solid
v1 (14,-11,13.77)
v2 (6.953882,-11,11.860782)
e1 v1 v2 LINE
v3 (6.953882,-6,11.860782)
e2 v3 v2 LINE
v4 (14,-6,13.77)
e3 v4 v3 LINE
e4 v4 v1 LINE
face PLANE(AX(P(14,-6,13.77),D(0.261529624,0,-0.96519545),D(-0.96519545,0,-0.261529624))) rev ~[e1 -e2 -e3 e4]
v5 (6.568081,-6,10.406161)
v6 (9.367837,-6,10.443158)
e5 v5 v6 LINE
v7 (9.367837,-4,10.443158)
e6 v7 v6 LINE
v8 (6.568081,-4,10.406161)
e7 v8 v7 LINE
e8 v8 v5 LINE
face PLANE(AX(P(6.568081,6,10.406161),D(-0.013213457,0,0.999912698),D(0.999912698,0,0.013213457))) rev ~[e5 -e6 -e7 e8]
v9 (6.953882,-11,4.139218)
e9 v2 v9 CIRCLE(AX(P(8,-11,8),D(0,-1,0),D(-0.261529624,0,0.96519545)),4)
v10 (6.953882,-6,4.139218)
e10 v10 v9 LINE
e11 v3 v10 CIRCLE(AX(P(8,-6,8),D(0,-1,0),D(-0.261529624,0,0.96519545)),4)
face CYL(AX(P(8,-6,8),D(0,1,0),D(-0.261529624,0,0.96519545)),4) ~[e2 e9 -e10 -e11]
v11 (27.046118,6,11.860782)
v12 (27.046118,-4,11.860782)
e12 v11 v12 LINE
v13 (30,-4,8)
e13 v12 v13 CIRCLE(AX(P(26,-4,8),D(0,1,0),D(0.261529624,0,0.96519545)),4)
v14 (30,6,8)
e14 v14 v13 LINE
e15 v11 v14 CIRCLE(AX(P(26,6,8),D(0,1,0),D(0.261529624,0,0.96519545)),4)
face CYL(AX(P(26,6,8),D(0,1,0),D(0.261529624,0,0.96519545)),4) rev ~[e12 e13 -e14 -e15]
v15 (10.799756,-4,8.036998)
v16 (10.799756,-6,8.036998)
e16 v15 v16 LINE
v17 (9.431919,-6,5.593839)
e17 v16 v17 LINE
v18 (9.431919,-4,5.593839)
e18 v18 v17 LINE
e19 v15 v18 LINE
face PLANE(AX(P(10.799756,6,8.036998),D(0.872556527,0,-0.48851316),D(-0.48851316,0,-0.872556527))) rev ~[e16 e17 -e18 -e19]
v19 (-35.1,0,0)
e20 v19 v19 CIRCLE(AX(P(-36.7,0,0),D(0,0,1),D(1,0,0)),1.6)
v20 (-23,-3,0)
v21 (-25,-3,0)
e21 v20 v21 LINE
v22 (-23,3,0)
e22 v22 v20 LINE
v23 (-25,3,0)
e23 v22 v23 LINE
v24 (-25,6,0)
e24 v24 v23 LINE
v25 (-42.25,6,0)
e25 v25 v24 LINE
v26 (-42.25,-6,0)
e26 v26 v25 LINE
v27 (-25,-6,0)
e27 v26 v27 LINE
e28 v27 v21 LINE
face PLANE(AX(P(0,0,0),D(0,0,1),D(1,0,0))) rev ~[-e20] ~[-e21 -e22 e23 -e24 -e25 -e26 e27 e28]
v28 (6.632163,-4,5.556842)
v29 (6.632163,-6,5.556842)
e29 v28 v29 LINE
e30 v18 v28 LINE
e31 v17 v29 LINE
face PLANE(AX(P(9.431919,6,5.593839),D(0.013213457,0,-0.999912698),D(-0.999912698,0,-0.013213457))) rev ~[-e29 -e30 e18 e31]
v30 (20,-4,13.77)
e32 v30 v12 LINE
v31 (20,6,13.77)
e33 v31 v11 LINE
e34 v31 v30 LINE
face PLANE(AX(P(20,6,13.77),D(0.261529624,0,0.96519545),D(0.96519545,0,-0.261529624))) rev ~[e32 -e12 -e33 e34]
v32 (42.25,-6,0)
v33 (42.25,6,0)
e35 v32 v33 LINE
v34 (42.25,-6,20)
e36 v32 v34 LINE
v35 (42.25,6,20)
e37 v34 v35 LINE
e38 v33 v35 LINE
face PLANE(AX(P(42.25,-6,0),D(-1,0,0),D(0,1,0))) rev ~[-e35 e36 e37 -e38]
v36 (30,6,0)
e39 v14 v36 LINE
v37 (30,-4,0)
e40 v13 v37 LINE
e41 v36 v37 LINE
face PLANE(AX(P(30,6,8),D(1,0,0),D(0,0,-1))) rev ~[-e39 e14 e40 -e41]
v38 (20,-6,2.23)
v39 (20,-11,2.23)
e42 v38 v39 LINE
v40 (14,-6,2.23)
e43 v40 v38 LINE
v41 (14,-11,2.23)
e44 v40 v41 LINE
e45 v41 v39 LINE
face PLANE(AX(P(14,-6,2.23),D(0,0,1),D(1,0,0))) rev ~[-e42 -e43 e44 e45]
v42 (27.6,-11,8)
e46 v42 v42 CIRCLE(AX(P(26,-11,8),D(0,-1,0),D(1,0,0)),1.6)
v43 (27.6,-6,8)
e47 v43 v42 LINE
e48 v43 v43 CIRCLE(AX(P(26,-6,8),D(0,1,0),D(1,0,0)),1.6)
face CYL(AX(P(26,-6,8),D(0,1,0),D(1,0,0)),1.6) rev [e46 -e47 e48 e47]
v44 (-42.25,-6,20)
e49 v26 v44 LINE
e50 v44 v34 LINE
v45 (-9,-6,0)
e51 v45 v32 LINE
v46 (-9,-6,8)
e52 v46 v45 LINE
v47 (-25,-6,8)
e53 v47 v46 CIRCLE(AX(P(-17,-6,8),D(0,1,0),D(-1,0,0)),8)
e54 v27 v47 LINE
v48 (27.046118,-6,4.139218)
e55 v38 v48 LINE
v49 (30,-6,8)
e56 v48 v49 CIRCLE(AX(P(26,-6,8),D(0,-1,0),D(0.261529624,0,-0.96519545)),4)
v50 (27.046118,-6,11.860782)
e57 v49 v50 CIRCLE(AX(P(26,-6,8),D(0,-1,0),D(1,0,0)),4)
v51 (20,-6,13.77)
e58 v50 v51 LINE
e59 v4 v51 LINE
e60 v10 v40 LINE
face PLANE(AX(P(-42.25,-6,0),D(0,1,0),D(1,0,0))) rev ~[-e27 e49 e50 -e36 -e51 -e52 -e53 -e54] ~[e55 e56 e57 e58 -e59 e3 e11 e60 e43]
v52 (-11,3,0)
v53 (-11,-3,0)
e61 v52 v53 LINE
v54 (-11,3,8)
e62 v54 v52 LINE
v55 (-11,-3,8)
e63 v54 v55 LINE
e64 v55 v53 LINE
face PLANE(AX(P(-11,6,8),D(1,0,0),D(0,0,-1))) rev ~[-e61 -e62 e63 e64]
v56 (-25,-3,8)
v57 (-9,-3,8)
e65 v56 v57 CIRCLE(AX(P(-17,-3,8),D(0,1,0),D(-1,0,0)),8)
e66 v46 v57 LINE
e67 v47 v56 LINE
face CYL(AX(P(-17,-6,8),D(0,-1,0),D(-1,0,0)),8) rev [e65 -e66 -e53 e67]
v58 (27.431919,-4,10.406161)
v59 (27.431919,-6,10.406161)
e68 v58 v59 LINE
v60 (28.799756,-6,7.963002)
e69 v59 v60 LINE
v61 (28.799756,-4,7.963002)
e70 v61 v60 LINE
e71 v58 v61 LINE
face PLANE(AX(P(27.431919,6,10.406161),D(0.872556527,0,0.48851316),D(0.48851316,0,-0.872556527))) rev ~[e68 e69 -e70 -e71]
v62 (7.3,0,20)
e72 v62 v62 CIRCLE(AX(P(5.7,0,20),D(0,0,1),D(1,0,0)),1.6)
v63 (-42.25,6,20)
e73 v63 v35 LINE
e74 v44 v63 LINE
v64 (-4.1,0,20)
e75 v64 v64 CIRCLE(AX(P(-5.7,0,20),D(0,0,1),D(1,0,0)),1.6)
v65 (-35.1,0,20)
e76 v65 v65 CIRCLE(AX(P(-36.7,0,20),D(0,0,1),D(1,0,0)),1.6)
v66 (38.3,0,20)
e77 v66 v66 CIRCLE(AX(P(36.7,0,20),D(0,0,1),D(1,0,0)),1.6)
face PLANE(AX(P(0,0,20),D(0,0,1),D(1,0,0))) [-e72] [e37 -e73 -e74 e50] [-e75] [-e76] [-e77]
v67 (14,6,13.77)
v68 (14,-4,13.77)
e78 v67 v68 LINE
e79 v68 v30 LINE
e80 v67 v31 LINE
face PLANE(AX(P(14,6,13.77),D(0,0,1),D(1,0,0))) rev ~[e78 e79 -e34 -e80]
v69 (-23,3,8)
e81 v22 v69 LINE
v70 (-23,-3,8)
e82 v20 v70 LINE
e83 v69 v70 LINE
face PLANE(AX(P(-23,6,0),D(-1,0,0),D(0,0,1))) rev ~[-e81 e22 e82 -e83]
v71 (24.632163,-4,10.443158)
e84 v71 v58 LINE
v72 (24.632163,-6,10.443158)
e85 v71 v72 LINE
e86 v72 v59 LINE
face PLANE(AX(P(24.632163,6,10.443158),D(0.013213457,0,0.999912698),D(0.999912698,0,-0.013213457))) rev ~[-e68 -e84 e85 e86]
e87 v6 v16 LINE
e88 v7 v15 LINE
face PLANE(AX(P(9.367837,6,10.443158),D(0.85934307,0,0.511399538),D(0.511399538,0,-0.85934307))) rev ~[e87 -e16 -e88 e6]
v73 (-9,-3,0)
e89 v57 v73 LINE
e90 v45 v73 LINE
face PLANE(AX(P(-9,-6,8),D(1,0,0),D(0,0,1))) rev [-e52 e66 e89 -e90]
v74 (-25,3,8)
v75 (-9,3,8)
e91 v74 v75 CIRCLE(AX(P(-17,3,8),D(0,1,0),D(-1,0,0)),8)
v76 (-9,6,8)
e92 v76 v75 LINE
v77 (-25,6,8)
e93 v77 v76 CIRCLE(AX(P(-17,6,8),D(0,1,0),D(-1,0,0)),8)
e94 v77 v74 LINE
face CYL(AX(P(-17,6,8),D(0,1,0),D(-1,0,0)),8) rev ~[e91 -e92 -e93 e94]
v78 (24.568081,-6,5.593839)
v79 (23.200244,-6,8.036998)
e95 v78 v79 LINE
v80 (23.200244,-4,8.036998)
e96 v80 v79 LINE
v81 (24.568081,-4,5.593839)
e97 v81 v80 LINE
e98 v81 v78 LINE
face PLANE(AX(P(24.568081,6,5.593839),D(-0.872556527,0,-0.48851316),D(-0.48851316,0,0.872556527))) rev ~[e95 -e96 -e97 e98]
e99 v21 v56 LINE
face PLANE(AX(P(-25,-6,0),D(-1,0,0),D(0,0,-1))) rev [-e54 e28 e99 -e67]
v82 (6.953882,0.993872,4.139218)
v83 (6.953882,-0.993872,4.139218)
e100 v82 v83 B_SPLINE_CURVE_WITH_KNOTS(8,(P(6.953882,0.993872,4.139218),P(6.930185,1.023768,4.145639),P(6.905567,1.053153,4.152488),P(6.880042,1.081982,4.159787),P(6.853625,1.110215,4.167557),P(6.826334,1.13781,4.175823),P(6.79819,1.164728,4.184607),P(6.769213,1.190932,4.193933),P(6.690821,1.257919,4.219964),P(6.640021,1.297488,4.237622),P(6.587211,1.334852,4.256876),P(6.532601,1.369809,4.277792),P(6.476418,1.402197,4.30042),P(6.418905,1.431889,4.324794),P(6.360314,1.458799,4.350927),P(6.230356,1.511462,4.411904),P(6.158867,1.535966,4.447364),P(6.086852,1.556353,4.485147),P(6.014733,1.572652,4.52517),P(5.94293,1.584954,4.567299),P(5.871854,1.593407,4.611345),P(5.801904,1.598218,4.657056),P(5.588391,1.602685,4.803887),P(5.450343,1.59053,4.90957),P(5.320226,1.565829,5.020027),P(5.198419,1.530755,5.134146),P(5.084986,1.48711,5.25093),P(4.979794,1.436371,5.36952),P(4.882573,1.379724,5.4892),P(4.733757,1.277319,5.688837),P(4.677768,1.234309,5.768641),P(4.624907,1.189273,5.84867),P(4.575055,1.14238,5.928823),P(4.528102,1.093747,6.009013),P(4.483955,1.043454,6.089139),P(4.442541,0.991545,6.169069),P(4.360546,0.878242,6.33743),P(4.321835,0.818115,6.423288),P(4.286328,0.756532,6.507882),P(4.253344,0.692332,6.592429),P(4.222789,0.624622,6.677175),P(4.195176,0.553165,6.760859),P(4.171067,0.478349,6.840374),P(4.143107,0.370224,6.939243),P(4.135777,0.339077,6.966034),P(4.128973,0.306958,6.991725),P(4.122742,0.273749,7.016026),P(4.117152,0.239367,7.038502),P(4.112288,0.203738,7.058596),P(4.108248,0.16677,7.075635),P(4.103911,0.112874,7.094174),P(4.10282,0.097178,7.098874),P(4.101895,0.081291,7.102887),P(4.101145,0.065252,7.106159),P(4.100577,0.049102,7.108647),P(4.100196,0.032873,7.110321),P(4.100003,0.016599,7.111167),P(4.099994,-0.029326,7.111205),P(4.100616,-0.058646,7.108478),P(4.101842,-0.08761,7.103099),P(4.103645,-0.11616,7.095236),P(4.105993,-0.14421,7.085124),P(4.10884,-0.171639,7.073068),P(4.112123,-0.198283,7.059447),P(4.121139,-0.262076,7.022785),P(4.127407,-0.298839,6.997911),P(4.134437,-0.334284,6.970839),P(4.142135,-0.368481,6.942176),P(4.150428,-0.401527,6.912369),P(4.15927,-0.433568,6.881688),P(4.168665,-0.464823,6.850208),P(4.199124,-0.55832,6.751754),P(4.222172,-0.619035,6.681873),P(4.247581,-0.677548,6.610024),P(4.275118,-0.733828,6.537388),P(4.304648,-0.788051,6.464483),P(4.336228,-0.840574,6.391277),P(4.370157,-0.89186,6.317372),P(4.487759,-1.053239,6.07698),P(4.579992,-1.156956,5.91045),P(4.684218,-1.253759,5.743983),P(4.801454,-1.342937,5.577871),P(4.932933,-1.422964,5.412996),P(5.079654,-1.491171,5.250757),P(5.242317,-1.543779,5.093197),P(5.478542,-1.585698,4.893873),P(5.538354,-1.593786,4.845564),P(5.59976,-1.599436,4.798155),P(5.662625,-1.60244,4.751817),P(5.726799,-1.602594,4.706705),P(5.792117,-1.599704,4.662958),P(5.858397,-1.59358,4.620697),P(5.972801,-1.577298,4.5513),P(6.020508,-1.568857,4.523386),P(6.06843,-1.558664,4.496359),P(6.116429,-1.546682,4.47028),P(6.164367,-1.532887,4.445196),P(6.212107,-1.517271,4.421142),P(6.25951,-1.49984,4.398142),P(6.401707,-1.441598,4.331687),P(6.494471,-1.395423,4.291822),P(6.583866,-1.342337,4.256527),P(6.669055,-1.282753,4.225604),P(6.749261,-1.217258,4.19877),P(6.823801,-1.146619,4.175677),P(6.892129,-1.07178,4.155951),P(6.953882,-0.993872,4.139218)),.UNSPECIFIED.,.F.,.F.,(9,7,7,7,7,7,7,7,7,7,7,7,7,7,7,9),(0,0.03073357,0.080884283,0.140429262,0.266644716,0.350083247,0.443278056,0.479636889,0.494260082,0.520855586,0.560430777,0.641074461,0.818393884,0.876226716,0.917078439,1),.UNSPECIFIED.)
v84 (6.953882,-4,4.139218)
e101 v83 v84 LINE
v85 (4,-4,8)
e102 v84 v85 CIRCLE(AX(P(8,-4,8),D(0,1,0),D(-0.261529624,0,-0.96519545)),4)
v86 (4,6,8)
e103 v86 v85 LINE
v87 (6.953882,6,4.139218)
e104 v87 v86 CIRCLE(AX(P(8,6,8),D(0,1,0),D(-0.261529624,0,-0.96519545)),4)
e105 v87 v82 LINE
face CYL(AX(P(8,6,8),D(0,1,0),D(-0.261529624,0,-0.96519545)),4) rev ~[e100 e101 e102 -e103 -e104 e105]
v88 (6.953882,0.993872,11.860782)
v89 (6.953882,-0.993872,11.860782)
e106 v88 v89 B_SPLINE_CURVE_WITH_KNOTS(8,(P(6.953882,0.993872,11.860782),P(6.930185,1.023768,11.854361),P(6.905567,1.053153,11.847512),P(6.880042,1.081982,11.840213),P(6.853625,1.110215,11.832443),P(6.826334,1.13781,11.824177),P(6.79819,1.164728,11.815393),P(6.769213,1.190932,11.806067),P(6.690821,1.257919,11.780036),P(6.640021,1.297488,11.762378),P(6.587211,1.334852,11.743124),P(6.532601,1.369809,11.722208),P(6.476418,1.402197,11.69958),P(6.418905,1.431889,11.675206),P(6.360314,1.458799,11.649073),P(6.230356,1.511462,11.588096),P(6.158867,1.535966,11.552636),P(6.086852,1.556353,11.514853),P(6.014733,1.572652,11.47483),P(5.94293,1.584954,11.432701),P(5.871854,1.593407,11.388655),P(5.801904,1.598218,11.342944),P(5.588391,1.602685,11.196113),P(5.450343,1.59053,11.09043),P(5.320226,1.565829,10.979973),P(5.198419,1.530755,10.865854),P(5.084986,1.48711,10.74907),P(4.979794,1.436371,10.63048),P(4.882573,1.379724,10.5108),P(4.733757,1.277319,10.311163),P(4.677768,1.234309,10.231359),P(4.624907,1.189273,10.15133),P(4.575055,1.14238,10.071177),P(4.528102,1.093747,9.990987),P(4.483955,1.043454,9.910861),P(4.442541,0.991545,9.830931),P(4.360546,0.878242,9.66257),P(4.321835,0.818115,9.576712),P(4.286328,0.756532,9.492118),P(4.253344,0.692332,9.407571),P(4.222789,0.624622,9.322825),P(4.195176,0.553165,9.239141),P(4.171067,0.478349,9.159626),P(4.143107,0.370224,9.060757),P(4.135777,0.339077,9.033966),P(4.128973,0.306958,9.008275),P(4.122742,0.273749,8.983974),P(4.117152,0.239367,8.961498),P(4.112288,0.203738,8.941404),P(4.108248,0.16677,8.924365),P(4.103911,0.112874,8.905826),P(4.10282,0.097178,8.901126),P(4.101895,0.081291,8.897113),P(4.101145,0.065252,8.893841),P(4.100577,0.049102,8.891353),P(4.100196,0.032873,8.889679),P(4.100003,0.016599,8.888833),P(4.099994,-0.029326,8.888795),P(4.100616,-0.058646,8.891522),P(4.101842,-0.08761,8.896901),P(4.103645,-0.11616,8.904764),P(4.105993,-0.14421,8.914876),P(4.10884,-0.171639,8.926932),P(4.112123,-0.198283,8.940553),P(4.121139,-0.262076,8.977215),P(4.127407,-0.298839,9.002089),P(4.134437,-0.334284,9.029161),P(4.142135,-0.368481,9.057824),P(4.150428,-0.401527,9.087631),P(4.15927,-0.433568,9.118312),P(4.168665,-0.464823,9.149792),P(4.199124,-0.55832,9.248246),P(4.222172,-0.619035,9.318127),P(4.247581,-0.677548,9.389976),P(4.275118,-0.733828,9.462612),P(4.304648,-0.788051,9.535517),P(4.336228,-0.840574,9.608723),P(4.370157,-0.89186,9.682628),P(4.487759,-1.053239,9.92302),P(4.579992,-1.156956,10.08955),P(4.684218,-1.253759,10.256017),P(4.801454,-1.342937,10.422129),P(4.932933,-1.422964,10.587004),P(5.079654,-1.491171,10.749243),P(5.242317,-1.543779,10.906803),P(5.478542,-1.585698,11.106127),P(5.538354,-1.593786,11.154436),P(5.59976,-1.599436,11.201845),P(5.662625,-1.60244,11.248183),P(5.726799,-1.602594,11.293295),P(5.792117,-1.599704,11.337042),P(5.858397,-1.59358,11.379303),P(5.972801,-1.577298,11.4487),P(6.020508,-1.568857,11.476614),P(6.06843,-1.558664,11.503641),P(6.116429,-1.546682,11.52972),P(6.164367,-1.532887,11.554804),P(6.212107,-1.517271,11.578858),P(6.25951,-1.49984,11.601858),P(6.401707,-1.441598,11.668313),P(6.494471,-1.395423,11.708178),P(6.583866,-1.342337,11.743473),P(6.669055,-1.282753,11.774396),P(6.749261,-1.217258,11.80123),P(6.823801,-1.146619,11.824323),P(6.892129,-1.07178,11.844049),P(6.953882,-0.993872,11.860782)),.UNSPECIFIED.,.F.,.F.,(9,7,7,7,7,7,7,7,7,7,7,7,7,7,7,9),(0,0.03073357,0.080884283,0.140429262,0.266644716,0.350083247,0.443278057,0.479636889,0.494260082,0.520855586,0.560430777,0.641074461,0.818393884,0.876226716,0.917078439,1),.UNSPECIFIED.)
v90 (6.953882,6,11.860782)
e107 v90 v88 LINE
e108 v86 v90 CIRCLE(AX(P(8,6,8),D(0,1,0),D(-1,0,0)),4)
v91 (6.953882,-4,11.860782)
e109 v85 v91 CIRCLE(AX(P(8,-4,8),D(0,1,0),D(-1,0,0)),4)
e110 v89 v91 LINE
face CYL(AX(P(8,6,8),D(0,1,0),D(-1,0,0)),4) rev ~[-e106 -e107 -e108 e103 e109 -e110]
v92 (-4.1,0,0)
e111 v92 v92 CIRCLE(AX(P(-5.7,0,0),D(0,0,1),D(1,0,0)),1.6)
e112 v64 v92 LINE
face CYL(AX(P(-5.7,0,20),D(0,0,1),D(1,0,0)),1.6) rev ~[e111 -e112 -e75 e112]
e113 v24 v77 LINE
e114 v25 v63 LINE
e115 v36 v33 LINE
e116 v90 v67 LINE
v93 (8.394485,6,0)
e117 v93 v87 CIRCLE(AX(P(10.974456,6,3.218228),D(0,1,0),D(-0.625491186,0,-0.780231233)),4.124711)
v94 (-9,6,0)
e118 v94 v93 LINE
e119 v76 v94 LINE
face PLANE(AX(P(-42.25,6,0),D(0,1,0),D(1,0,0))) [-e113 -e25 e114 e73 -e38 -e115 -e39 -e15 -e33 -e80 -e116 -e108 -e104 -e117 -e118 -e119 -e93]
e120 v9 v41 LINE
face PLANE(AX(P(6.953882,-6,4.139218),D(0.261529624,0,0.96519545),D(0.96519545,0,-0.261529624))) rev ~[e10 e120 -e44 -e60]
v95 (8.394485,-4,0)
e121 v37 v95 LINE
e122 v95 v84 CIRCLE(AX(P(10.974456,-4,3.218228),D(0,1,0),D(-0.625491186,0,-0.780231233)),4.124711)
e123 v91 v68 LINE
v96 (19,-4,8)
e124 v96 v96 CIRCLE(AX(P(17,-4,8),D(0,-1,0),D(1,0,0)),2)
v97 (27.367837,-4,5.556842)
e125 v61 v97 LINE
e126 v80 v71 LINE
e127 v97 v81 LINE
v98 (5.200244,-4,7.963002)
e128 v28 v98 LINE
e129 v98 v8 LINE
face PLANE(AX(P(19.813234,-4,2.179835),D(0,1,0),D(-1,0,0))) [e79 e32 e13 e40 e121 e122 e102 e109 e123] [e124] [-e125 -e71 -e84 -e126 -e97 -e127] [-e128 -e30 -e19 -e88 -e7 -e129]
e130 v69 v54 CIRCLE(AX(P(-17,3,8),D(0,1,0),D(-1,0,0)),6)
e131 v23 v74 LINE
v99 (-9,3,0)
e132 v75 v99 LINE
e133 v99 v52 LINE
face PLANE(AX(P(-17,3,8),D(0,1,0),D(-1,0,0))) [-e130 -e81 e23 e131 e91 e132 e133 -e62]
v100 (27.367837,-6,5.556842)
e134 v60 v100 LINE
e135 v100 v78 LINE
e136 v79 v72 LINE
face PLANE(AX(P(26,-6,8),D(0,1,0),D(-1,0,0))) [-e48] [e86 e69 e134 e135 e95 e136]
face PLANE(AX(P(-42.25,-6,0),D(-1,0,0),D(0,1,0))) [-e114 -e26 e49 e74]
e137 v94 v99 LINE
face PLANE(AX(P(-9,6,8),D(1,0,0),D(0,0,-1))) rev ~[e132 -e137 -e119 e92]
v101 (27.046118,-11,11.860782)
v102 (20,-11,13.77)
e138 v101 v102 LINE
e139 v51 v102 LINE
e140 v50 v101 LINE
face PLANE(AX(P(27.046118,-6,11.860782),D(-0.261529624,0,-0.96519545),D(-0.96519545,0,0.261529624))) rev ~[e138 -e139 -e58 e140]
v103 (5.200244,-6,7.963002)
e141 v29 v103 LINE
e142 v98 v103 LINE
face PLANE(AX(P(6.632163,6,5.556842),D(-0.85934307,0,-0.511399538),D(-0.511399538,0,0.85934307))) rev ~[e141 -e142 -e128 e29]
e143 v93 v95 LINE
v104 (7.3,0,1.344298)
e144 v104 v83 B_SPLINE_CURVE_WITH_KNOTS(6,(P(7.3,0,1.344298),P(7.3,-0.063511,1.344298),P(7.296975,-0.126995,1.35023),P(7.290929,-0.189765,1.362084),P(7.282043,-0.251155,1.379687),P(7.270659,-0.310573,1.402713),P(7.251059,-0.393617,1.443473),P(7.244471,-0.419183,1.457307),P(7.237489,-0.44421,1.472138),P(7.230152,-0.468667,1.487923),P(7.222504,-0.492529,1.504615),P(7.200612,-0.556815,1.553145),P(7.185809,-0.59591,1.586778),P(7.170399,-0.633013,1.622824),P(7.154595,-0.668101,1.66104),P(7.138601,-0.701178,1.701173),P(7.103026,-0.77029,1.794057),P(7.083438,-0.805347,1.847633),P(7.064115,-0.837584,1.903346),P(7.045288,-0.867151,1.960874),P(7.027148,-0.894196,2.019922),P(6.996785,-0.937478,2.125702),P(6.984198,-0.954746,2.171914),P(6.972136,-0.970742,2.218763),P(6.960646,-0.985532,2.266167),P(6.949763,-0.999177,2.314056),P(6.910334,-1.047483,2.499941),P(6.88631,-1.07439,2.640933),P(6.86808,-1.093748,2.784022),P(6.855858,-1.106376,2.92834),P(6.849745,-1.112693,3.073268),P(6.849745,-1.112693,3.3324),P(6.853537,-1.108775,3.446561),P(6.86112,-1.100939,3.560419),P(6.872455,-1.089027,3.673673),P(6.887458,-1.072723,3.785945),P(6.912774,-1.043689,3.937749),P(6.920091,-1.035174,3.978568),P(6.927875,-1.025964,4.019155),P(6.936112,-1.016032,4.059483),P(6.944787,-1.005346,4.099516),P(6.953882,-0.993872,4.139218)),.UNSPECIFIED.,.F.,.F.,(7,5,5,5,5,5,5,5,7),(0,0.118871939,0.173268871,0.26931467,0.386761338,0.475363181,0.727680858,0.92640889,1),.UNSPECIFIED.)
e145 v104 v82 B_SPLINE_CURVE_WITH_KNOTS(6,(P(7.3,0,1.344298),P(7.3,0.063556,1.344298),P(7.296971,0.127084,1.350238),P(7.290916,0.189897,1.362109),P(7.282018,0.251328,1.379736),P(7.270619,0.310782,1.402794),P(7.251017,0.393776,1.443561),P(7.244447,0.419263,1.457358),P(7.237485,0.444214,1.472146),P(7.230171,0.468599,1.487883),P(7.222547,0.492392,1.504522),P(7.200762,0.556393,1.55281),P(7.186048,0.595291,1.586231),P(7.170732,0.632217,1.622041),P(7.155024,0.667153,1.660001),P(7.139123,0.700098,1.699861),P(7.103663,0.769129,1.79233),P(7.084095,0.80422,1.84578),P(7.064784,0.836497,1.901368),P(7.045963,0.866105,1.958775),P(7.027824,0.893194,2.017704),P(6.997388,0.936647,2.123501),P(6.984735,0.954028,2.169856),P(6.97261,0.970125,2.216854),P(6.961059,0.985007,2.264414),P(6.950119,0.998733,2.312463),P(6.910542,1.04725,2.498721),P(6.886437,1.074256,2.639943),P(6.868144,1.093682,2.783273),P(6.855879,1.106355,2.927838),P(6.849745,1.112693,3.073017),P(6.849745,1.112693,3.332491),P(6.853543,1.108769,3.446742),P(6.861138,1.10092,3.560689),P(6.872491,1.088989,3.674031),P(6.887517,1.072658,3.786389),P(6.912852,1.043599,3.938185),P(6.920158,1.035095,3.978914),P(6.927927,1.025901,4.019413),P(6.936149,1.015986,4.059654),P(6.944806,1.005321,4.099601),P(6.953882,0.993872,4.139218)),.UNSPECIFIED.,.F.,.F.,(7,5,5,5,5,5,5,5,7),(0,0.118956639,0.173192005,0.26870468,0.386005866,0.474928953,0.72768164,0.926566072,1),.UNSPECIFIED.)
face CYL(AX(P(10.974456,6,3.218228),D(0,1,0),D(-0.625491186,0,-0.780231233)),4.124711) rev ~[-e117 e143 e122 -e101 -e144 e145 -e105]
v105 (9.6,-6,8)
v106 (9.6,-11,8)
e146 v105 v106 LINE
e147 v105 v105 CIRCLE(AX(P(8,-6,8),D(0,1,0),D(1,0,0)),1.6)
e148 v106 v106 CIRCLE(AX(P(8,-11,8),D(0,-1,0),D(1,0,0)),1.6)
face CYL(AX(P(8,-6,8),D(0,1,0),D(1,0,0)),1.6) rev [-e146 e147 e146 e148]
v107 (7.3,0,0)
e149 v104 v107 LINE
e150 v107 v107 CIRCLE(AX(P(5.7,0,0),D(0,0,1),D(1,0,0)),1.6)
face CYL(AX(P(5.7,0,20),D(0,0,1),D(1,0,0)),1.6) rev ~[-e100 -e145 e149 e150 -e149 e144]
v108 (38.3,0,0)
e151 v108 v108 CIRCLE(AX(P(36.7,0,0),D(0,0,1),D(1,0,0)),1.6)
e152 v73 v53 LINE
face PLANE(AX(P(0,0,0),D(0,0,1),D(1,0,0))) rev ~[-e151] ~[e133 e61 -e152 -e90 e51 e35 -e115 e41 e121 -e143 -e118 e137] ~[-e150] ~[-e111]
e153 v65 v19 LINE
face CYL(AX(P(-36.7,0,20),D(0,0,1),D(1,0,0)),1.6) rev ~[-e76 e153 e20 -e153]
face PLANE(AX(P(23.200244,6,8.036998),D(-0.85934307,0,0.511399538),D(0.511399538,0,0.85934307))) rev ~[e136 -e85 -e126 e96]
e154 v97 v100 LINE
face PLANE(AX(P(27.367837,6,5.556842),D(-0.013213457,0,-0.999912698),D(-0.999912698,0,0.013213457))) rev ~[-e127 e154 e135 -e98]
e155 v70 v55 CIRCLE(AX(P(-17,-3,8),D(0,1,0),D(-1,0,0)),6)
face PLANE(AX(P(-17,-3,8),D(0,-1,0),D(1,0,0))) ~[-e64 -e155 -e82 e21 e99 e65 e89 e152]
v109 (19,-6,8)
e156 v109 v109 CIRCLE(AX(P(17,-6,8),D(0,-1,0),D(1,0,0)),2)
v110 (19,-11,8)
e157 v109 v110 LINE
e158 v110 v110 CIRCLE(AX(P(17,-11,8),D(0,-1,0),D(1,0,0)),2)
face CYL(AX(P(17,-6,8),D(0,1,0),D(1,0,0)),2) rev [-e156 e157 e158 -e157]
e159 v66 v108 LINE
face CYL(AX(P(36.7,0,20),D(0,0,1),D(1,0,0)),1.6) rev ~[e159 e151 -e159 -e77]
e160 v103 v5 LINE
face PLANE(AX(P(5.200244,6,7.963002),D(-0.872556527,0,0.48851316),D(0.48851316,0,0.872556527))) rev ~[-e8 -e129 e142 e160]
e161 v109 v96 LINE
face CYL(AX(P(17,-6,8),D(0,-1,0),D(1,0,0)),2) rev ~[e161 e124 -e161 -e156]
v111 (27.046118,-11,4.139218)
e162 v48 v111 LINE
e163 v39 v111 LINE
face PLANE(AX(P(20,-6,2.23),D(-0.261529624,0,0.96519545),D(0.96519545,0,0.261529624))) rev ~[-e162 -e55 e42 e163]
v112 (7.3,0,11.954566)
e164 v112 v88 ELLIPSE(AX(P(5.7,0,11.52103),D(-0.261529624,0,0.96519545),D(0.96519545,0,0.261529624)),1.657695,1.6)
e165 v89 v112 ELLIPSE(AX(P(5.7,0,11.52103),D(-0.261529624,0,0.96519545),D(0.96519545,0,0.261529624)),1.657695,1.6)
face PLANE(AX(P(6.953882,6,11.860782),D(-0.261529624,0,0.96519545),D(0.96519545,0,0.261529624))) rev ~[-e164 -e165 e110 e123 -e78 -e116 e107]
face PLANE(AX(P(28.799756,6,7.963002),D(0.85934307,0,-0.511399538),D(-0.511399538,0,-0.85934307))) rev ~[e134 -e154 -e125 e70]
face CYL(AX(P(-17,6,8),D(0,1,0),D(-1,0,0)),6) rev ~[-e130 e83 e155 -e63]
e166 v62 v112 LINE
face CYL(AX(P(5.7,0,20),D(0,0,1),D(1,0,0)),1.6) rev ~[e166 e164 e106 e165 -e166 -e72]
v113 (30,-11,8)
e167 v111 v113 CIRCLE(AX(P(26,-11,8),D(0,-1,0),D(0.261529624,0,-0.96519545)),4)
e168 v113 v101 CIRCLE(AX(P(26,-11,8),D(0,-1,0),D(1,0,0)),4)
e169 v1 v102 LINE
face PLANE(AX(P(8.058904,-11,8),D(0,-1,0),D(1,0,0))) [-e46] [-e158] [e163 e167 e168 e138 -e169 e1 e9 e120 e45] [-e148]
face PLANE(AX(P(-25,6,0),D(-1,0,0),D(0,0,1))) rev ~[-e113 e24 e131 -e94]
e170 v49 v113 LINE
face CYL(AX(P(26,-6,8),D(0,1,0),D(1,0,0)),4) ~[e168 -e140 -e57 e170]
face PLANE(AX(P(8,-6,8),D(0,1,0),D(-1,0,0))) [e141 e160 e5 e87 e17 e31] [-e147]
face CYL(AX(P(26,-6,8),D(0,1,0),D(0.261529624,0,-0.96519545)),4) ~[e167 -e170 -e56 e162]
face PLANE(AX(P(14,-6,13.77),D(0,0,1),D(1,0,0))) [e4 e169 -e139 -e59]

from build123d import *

# Parameters (mm, degrees)
F0_W      = 84.5
F0_H      = 12
F1_DEPTH  = 20
F3_DEPTH  = 3
F4_DEPTH  = 25
F5_R      = 1.6
F5_W      = 6
F5_H      = 11.54
F5_R_2    = 2
F6_DEPTH  = 5
F7_DEPTH  = 25
F8_R      = 2
F8_R_2    = 1.6
F9_DEPTH  = 10
F10_R     = 1.6
F11_DEPTH = 25
F12_R     = 1.6
F13_DEPTH = 12
F14_DEPTH = 10


# Not quite as in the source:
# - a pattern or mirror of a feature is missing from the dataset's text; its kind, count and spacing are read off the source's solid


with BuildPart() as f1:
    # F0 (on Top) → F1 (new body)
    with BuildSketch(Plane.XY):
        Rectangle(F0_W, F0_H)
    extrude(amount=F1_DEPTH)

    # F2 (on face) → F3 (cut)
    with BuildSketch(Plane(origin=(0, 6, 0), x_dir=(-1, 0, 0), z_dir=(0, 1, 0))):
        with BuildLine():
            ThreePointArc((11, 8), (17, 2), (23, 8))
            ThreePointArc((23, 8), (17, 14), (11, 8))
        make_face()
        with BuildLine():
            Line((23, 2.7084973779), (23, 8))
            ThreePointArc((23, 8), (17, 2), (11, 8))
            Line((11, 8), (11, 2.7084973779))
            ThreePointArc((11, 2.7084973779), (13.7084973779, 0.7084973779), (17, 0))
            ThreePointArc((17, 0), (20.2915026221, 0.7084973779), (23, 2.7084973779))
        make_face()
        with BuildLine():
            Line((23, 0), (23, 2.7084973779))
            ThreePointArc((23, 2.7084973779), (20.2915026221, 0.7084973779), (17, 0))
            Line((17, 0), (23, 0))
        make_face()
        with BuildLine():
            ThreePointArc((25, 8), (24.4833147735, 5.1715728753), (23, 2.7084973779))
            Line((23, 2.7084973779), (23, 0))
            Line((23, 0), (25, 0))
            Line((25, 0), (25, 8))
        make_face()
        with BuildLine():
            ThreePointArc((17, 0), (13.7084973779, 0.7084973779), (11, 2.7084973779))
            Line((11, 2.7084973779), (11, 0))
            Line((11, 0), (17, 0))
        make_face()
        with BuildLine():
            Line((11, 0), (11, 2.7084973779))
            ThreePointArc((11, 2.7084973779), (9.5166852265, 5.1715728753), (9, 8))
            Line((9, 8), (9, 0))
            Line((9, 0), (11, 0))
        make_face()
        with BuildLine():
            ThreePointArc((11, 8), (17, 14), (23, 8))
            Line((23, 8), (23, 2.7084973779))
            ThreePointArc((23, 2.7084973779), (24.4833147735, 5.1715728753), (25, 8))
            ThreePointArc((25, 8), (17, 16), (9, 8))
            ThreePointArc((9, 8), (9.5166852265, 5.1715728753), (11, 2.7084973779))
            Line((11, 2.7084973779), (11, 8))
        make_face()
    f3 = extrude(amount=-F3_DEPTH, mode=Mode.SUBTRACT)

    # F3_copies: F3 across plane
    add(f3.mirror(Plane(origin=(0, 0, 0), x_dir=(0, 0, -1), z_dir=(0, -1, 0))), mode=Mode.SUBTRACT)

    # F2 (on face) → F4 (cut)
    with BuildSketch(Plane(origin=(0, 6, 0), x_dir=(-1, 0, 0), z_dir=(0, 1, 0))):
        with BuildLine():
            Line((23, 2.7084973779), (23, 8))
            ThreePointArc((23, 8), (17, 2), (11, 8))
            Line((11, 8), (11, 2.7084973779))
            ThreePointArc((11, 2.7084973779), (13.7084973779, 0.7084973779), (17, 0))
            ThreePointArc((17, 0), (20.2915026221, 0.7084973779), (23, 2.7084973779))
        make_face()
        with BuildLine():
            Line((23, 0), (23, 2.7084973779))
            ThreePointArc((23, 2.7084973779), (20.2915026221, 0.7084973779), (17, 0))
            Line((17, 0), (23, 0))
        make_face()
        with BuildLine():
            ThreePointArc((17, 0), (13.7084973779, 0.7084973779), (11, 2.7084973779))
            Line((11, 2.7084973779), (11, 0))
            Line((11, 0), (17, 0))
        make_face()
        with BuildLine():
            ThreePointArc((11, 8), (17, 2), (23, 8))
            ThreePointArc((23, 8), (17, 14), (11, 8))
        make_face()
    extrude(amount=-F4_DEPTH, mode=Mode.SUBTRACT)

    # F5 (on face) → F6 (join)
    with BuildSketch(Plane.XZ.offset(6)):
        with BuildLine():
            ThreePointArc((12, 8), (10.430589025, 11.1768281338), (6.9538815041, 11.8607817981))
            ThreePointArc((6.9538815041, 11.8607817981), (4, 8), (6.9538815041, 4.1392182019))
            ThreePointArc((6.9538815041, 4.1392182019), (10.430589025, 4.8231718662), (12, 8))
        make_face()
        with Locations((8, 8)):
            Circle(F5_R, mode=Mode.SUBTRACT)
        with BuildLine():
            Line((14, 2.23), (14, 13.77))
            Line((14, 13.77), (6.9538815041, 11.8607817981))
            ThreePointArc((6.9538815041, 11.8607817981), (10.430589025, 11.1768281338), (12, 8))
            ThreePointArc((12, 8), (10.430589025, 4.8231718662), (6.9538815041, 4.1392182019))
            Line((6.9538815041, 4.1392182019), (14, 2.23))
        make_face()
        with Locations((17, 8)):
            Rectangle(F5_W, F5_H)
        with Locations((17, 8)):
            Circle(F5_R_2, mode=Mode.SUBTRACT)
        with BuildLine():
            Line((27.0461184959, 11.8607817981), (20, 13.77))
            Line((20, 13.77), (20, 2.23))
            Line((20, 2.23), (27.0461184959, 4.1392182019))
            ThreePointArc((27.0461184959, 4.1392182019), (22, 8), (27.0461184959, 11.8607817981))
        make_face()
        with BuildLine():
            ThreePointArc((30, 8), (29.1768281338, 10.430589025), (27.0461184959, 11.8607817981))
            ThreePointArc((27.0461184959, 11.8607817981), (22, 8), (27.0461184959, 4.1392182019))
            ThreePointArc((27.0461184959, 4.1392182019), (29.1768281338, 5.569410975), (30, 8))
        make_face()
        with Locations((26, 8)):
            Circle(F5_R, mode=Mode.SUBTRACT)
    extrude(amount=F6_DEPTH)

    # F5 (on face) → F7 (cut)
    with BuildSketch(Plane.XZ.offset(6)):
        with Locations((8, 8)):
            Circle(F5_R)
        with Locations((17, 8)):
            Circle(F5_R_2)
        with Locations((26, 8)):
            Circle(F5_R)
    extrude(amount=-F7_DEPTH, mode=Mode.SUBTRACT)

    # F8 (on face) → F9 (cut)
    with BuildSketch(Plane(origin=(0, 6, 0), x_dir=(-1, 0, 0), z_dir=(0, 1, 0))):
        with BuildLine():
            Line((-6.9538815041, 11.8607817981), (-14, 13.77))
            Line((-14, 13.77), (-20, 13.77))
            Line((-20, 13.77), (-27.0461184959, 11.8607817981))
            ThreePointArc((-27.0461184959, 11.8607817981), (-23.569410975, 11.1768281338), (-22, 8))
            ThreePointArc((-22, 8), (-23.569410975, 4.8231718662), (-27.0461184959, 4.1392182019))
            Line((-27.0461184959, 4.1392182019), (-20, 2.23))
            Line((-20, 2.23), (-14, 2.23))
            Line((-14, 2.23), (-6.9538815041, 4.1392182019))
            ThreePointArc((-6.9538815041, 4.1392182019), (-12, 8), (-6.9538815041, 11.8607817981))
        make_face()
        with Locations((-17, 8)):
            Circle(F8_R, mode=Mode.SUBTRACT)
        with BuildLine():
            ThreePointArc((-4, 8), (-4.8231718662, 10.430589025), (-6.9538815041, 11.8607817981))
            ThreePointArc((-6.9538815041, 11.8607817981), (-12, 8), (-6.9538815041, 4.1392182019))
            ThreePointArc((-6.9538815041, 4.1392182019), (-4.8231718662, 5.569410975), (-4, 8))
        make_face()
        with Locations((-8, 8)):
            Circle(F8_R_2, mode=Mode.SUBTRACT)
        with BuildLine():
            ThreePointArc((-22, 8), (-23.569410975, 11.1768281338), (-27.0461184959, 11.8607817981))
            ThreePointArc((-27.0461184959, 11.8607817981), (-29.1768281338, 10.430589025), (-30, 8))
            ThreePointArc((-30, 8), (-29.1768281338, 5.569410975), (-27.0461184959, 4.1392182019))
            ThreePointArc((-27.0461184959, 4.1392182019), (-23.569410975, 4.8231718662), (-22, 8))
        make_face()
        with Locations((-26, 8)):
            Circle(F8_R_2, mode=Mode.SUBTRACT)
    extrude(amount=-F9_DEPTH, mode=Mode.SUBTRACT)

    # F10 (on face) → F11 (cut)
    with BuildSketch(Plane.XY.offset(20)):
        with Locations((-36.7, 0)):
            Circle(F10_R)
        with Locations((-5.7, 0)):
            Circle(F10_R)
        with Locations((5.7, 0)):
            Circle(F10_R)
        with Locations((36.7, 0)):
            Circle(F10_R)
    extrude(amount=-F11_DEPTH, mode=Mode.SUBTRACT)

    # F12 (on face) → F13 (cut)
    with BuildSketch(Plane(origin=(0, 6, 0), x_dir=(-1, 0, 0), z_dir=(0, 1, 0))):
        Polygon((-6.5680812925, 10.4061605963), (-9.3678368482, 10.443158275), (-10.7997555557, 8.0369976787), (-9.4319187075, 5.5938394037), (-6.6321631518, 5.556841725), (-5.2002444443, 7.9630023213), align=None)
        with Locations((-8, 8)):
            Circle(F12_R, mode=Mode.SUBTRACT)
        Polygon((-28.7997555557, 7.9630023213), (-27.3678368482, 5.556841725), (-24.5680812925, 5.5938394037), (-23.2002444443, 8.0369976787), (-24.6321631518, 10.443158275), (-27.4319187075, 10.4061605963), align=None)
        with Locations((-26, 8)):
            Circle(F12_R, mode=Mode.SUBTRACT)
    extrude(amount=-F13_DEPTH, mode=Mode.SUBTRACT)

    # F8 (on face) → F14 (cut)
    with BuildSketch(Plane(origin=(0, 6, 0), x_dir=(-1, 0, 0), z_dir=(0, 1, 0))):
        with BuildLine():
            ThreePointArc((-8.3944853395, 0), (-7.0789353021, 1.8624403356), (-6.9538815041, 4.1392182019))
            Line((-6.9538815041, 4.1392182019), (-14, 2.23))
            Line((-14, 2.23), (-20, 2.23))
            Line((-20, 2.23), (-27.0461184959, 4.1392182019))
            ThreePointArc((-27.0461184959, 4.1392182019), (-29.1768281338, 5.569410975), (-30, 8))
            Line((-30, 8), (-30, 0))
            Line((-30, 0), (-8.3944853395, 0))
        make_face()
    extrude(amount=-F14_DEPTH, mode=Mode.SUBTRACT)


solid = f1.part
